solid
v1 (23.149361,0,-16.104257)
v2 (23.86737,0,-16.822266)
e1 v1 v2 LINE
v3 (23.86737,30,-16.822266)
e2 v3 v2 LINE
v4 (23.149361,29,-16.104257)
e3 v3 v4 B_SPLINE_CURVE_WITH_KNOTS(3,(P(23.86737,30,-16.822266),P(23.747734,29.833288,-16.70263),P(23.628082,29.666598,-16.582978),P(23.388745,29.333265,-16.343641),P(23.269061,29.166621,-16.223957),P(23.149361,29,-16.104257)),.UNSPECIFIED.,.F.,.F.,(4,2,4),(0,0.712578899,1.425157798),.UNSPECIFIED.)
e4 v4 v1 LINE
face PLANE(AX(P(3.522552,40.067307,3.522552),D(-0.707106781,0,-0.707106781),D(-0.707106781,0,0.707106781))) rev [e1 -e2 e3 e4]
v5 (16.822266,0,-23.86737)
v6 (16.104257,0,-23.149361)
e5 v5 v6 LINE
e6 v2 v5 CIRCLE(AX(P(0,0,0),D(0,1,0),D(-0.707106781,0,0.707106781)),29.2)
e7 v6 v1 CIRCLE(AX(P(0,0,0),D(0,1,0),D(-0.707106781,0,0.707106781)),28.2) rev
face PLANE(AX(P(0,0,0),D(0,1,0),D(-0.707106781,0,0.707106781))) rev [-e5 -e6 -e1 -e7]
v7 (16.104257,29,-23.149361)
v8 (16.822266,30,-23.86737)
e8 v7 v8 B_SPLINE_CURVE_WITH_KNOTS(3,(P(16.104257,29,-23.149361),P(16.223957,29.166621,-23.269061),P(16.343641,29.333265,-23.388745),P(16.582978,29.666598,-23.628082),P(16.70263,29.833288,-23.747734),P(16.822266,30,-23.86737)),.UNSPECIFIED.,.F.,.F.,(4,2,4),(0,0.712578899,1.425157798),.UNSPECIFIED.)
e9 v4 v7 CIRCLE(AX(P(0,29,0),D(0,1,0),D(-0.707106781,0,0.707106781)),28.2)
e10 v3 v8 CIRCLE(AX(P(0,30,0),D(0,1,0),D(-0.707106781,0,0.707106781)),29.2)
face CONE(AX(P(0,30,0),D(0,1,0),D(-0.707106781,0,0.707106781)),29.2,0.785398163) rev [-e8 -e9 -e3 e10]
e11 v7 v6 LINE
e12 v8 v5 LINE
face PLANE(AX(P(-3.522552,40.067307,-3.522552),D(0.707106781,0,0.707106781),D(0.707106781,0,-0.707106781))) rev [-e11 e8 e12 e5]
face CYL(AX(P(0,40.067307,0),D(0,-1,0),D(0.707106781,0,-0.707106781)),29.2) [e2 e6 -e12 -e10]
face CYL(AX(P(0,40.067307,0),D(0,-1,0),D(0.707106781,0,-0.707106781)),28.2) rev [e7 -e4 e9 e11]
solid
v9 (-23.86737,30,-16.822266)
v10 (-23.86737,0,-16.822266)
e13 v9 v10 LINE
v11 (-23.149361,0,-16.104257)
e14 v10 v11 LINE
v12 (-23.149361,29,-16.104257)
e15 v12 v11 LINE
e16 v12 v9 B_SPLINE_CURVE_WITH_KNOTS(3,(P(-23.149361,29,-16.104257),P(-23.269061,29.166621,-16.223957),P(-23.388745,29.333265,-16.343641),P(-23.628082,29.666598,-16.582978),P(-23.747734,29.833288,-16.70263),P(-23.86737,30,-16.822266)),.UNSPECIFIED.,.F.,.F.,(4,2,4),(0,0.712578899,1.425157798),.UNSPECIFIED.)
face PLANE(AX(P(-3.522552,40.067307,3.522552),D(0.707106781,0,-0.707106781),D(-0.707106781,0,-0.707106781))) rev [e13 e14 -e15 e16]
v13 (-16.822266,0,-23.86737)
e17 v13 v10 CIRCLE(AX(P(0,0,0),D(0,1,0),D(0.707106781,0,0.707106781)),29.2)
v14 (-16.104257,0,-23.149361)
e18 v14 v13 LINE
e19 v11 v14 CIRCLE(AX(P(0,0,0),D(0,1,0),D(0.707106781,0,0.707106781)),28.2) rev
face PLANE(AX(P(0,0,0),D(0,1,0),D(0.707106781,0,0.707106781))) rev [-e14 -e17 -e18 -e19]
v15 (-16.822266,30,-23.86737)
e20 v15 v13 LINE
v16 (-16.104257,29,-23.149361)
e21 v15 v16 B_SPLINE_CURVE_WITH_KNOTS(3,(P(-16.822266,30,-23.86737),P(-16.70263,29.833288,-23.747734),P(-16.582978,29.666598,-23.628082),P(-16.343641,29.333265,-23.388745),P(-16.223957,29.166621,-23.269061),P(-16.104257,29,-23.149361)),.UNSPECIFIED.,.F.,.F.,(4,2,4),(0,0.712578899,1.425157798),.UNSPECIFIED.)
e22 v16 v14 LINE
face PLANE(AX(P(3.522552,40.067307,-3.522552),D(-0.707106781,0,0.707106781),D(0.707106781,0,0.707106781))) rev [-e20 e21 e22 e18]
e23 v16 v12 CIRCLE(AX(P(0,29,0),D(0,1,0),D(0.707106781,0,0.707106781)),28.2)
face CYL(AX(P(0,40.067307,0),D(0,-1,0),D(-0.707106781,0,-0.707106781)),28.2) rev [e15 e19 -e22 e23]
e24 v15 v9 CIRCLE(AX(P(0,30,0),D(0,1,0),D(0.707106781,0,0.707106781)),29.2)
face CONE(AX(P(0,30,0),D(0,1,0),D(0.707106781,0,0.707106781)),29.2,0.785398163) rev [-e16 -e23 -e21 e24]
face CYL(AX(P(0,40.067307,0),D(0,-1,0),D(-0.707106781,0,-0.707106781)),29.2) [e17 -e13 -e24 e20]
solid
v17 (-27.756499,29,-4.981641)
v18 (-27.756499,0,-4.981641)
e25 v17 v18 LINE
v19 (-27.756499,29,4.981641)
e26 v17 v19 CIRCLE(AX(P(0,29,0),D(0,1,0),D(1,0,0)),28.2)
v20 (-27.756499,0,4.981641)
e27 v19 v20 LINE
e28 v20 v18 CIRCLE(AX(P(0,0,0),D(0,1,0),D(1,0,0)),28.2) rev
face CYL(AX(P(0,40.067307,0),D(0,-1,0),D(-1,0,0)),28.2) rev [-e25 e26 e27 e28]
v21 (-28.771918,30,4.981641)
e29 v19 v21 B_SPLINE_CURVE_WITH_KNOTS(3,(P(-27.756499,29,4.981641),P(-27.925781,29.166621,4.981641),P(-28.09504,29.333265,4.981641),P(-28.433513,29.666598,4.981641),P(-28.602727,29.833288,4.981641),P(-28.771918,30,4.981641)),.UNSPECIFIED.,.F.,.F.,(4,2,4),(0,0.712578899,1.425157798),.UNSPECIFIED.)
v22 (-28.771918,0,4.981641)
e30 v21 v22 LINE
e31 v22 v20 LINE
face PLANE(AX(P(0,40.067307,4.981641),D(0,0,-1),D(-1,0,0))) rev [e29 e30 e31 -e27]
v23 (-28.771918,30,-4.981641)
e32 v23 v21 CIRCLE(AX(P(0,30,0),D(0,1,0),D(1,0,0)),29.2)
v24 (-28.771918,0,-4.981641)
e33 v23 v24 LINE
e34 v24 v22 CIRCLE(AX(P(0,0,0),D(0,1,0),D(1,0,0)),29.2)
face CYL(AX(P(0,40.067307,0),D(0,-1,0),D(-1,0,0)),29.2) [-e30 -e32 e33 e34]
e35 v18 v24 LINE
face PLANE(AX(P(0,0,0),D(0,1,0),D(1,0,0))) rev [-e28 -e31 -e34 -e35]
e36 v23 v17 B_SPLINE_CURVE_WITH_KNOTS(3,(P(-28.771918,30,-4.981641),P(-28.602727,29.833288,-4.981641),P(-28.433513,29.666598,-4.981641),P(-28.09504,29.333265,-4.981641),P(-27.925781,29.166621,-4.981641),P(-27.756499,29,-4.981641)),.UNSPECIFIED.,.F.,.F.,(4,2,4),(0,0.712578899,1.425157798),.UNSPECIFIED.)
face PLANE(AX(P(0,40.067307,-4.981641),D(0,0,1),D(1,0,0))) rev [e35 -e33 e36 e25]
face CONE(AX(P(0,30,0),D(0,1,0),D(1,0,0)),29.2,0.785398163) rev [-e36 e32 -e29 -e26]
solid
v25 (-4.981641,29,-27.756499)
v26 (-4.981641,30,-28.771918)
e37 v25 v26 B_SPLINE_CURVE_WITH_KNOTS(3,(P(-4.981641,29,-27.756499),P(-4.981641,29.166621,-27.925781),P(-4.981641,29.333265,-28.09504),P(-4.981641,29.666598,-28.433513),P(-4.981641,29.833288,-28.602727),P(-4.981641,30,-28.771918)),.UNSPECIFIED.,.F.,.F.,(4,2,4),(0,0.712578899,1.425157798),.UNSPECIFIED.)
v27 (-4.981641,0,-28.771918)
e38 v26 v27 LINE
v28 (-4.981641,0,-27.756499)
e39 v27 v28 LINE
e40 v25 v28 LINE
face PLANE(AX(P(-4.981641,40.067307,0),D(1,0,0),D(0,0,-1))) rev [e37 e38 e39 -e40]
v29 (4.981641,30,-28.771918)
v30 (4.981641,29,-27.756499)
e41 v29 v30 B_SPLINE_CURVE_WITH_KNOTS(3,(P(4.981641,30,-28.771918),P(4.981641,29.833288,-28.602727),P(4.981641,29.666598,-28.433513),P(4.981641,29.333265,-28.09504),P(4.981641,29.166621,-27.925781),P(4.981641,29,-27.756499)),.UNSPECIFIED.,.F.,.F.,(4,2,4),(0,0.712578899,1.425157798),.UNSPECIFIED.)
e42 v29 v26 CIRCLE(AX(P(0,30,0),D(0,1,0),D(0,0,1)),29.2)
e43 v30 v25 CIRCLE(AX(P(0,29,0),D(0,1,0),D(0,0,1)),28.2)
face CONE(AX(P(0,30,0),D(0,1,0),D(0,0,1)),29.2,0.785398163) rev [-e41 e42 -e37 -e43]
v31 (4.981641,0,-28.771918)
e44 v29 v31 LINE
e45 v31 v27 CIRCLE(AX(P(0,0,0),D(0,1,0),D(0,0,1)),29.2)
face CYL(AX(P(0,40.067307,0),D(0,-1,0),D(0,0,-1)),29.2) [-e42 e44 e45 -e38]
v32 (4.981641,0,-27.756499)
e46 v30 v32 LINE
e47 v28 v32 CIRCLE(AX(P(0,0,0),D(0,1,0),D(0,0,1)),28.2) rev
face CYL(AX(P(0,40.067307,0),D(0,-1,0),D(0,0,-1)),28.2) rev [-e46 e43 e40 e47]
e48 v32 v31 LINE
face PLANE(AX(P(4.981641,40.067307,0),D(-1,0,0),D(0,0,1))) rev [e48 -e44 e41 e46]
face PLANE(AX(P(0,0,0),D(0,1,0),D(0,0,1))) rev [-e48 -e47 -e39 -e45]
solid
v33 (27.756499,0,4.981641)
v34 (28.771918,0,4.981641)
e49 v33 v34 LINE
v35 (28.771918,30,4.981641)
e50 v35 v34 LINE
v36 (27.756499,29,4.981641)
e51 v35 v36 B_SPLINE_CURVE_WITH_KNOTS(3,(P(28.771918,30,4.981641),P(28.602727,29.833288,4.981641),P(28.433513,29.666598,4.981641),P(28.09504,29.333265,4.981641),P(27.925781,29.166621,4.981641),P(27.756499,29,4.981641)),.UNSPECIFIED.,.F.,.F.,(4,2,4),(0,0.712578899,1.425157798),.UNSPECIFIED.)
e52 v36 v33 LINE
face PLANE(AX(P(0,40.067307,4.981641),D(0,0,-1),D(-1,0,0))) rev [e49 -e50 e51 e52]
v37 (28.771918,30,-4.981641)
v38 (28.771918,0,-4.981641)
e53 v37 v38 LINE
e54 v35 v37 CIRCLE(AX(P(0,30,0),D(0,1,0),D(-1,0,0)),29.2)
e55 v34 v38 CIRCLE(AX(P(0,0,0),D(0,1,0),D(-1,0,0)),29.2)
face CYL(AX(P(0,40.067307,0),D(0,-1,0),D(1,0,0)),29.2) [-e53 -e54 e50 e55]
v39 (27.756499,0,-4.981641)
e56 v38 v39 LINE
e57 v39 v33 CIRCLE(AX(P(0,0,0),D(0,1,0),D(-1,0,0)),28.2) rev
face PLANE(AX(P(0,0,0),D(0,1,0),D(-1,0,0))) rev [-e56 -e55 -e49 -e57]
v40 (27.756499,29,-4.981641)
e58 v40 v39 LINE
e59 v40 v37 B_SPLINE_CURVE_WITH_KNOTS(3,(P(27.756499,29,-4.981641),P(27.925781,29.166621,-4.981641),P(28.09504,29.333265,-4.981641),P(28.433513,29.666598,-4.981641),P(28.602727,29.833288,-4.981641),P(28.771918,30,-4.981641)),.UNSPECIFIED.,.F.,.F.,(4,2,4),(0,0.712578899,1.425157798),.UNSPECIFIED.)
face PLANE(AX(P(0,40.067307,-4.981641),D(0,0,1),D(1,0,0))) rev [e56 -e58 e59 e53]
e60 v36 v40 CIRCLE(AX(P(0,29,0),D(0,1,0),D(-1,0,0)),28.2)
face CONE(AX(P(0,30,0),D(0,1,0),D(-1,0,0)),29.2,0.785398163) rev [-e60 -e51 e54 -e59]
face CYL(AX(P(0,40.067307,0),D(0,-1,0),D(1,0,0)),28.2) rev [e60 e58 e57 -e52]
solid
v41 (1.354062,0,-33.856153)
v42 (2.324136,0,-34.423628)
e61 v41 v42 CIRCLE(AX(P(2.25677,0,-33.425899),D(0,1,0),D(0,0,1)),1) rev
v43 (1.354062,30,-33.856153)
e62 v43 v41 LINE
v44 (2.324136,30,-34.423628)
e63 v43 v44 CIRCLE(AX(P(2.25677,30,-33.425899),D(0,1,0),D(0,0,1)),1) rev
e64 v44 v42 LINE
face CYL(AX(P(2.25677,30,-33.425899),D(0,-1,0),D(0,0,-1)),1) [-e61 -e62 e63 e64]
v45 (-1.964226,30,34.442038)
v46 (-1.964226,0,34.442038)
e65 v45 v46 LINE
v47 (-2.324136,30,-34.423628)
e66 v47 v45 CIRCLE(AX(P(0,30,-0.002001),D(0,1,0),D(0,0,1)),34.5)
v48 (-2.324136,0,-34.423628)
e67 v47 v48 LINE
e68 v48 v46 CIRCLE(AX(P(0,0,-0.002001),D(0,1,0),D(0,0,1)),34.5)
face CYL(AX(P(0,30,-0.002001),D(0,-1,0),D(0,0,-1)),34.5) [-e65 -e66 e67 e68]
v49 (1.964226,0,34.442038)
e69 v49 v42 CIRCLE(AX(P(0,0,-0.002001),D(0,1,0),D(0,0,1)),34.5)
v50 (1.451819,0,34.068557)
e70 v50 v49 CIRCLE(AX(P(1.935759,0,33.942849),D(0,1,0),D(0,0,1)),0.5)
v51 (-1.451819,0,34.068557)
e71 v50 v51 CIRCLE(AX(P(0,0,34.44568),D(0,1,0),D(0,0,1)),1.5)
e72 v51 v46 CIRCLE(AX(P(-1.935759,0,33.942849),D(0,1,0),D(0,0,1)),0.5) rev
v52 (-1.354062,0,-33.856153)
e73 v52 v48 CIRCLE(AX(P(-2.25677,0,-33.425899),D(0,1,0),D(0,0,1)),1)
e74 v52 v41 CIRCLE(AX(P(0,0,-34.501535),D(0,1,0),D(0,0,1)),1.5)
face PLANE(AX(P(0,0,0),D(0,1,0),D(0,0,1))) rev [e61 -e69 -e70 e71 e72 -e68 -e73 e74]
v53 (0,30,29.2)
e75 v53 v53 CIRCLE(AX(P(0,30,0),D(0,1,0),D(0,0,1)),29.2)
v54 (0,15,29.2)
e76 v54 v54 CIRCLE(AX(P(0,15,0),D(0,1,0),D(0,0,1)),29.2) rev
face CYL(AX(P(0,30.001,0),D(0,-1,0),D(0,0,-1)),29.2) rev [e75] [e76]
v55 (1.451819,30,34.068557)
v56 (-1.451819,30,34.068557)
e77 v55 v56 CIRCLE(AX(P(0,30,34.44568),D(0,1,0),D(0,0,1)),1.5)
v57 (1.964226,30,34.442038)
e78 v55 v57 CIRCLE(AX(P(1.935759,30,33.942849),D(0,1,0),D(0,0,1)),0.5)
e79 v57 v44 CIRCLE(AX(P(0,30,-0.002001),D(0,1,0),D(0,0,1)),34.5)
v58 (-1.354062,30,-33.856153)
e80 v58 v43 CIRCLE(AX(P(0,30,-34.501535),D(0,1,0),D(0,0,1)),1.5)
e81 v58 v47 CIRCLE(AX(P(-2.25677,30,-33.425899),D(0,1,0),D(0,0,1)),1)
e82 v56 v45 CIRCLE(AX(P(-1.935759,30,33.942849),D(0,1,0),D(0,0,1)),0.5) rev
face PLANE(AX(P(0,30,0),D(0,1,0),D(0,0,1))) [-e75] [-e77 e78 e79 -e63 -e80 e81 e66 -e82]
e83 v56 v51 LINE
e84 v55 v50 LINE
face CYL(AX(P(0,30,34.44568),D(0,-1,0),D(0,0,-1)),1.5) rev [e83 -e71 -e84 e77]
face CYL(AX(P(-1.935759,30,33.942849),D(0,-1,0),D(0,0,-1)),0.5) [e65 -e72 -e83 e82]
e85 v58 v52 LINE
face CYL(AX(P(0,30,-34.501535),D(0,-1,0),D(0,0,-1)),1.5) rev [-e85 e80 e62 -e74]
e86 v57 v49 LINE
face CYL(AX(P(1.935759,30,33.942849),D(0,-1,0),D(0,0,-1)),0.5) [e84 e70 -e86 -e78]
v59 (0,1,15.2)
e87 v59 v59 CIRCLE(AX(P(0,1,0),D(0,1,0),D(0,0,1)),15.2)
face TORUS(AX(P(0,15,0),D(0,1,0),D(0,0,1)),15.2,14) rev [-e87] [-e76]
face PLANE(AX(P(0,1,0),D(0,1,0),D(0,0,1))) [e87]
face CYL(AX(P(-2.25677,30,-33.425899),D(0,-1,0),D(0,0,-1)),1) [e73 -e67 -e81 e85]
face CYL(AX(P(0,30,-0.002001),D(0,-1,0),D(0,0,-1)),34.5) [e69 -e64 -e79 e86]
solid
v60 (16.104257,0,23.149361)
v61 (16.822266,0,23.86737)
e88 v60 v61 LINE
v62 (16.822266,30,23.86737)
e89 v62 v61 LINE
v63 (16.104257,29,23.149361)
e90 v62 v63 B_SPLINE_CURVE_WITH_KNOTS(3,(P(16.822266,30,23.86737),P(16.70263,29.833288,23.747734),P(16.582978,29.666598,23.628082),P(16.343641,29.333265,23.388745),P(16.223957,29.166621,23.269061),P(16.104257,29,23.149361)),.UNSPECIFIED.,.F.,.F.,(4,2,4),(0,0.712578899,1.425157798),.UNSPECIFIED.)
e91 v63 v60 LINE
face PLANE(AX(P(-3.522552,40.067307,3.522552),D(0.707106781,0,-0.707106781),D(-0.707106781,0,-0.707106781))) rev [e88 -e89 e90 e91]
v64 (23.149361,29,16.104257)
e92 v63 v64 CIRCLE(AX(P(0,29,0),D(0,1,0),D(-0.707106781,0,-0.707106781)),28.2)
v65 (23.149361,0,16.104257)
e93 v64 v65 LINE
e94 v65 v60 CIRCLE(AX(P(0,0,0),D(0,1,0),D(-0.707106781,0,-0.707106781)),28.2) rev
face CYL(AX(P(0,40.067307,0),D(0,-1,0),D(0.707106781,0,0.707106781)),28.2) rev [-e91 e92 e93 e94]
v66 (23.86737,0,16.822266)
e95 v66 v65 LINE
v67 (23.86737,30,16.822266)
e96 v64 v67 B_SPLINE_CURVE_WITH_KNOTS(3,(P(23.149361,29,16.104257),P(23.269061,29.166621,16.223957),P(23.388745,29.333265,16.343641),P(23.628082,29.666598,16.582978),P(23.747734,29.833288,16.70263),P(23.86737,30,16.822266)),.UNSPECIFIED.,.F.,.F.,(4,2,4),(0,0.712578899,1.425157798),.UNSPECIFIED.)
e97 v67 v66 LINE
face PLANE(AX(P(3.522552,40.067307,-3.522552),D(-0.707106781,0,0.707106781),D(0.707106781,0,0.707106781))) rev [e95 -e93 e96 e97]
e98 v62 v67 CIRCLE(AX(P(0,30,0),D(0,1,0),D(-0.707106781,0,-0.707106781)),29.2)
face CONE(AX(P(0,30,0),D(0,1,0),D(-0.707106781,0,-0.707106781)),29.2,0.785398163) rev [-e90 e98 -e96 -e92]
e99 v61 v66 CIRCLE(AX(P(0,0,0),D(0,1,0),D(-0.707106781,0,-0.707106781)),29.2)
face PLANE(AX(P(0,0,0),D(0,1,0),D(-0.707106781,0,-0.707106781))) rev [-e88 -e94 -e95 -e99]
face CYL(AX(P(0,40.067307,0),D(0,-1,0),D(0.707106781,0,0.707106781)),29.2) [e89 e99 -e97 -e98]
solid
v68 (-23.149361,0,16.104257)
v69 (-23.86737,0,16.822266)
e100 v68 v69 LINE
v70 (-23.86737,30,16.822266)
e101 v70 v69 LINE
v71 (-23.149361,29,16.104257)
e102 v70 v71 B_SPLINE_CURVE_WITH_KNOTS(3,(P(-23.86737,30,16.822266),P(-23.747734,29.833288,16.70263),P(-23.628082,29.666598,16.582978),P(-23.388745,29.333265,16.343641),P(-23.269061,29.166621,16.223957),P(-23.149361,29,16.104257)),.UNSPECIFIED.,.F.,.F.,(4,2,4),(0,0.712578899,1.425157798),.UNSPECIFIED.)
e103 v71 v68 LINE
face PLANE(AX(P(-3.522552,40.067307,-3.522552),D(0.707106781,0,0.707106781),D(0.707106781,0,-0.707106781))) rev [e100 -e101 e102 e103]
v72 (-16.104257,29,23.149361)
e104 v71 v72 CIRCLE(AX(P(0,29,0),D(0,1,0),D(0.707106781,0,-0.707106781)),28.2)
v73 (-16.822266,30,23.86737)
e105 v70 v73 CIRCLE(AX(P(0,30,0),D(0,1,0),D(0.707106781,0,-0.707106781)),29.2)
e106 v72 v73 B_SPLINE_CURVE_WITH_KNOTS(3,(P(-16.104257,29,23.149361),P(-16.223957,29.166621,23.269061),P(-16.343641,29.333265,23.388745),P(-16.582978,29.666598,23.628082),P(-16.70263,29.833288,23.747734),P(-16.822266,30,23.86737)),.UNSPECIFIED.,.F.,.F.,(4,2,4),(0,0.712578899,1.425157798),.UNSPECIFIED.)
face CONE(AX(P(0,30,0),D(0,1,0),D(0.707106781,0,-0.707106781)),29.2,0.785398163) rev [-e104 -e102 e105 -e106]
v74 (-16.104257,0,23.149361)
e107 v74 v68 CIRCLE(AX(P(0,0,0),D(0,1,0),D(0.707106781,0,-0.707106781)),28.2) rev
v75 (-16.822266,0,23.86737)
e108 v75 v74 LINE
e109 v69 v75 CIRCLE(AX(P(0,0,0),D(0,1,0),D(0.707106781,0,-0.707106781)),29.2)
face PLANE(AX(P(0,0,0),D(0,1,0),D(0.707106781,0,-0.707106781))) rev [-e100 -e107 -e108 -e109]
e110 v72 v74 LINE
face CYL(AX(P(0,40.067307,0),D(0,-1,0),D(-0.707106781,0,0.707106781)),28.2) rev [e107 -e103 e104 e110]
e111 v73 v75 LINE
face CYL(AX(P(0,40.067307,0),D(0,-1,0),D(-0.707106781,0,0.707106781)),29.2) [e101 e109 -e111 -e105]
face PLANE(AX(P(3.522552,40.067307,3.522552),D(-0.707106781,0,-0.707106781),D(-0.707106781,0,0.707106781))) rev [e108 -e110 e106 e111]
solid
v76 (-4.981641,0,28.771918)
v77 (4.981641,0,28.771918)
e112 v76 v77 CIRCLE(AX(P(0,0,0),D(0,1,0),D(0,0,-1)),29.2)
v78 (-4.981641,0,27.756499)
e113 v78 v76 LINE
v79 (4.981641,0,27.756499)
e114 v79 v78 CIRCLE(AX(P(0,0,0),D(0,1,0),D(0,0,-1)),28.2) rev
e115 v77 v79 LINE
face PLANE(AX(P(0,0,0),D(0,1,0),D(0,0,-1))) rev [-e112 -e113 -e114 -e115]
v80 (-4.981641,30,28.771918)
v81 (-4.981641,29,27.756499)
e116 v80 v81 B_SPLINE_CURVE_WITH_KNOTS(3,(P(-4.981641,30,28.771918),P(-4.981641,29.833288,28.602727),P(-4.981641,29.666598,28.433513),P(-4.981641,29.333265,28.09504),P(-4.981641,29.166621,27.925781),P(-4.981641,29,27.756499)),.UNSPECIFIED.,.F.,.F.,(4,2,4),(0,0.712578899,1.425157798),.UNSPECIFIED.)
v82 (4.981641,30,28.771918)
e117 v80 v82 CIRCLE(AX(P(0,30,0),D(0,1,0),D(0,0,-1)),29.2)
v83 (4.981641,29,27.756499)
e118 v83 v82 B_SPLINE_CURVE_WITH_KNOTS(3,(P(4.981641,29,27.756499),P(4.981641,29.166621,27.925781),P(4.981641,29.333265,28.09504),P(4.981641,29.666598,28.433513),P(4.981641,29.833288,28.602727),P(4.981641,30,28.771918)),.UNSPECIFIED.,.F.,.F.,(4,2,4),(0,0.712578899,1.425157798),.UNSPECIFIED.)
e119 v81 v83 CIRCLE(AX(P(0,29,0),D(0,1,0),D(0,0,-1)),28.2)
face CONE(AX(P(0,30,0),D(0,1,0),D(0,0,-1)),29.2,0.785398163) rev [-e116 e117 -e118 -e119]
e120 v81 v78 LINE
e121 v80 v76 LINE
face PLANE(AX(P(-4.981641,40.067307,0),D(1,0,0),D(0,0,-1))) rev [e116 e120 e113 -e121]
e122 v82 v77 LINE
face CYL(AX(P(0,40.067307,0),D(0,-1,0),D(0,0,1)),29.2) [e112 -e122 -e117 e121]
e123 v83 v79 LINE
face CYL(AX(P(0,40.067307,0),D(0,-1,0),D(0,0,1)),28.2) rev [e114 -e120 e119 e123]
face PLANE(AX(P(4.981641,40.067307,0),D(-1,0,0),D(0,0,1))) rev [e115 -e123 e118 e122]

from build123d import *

# Parameters (mm, degrees)
BOSS_EXTRUDE1_DEPTH = 30
CUT_EXTRUDE2_REACH  = 60.241
CUT_EXTRUDE2_START  = 1
SKETCH2_R           = 29.2
BOSS_EXTRUDE2_DEPTH = 30
CHAMFER2_SIZE       = 1
CIRPATTERN2_COUNT   = 8
FILLET2_R           = 14


with BuildPart() as part:
    # Sketch1 → Boss-Extrude1 (new body)
    with BuildSketch(Plane(origin=(0, 0, 0), x_dir=(1, 0, 0), z_dir=(0, 1, 0))):
        with BuildLine():
            ThreePointArc((1.451818925, -34.068556857), (1.641248992, -34.346908706), (1.964225605, -34.442038138))
            ThreePointArc((1.964225605, -34.442038138), (34.499528846, -0.178302888), (2.324135821, 34.423627607))
            ThreePointArc((2.324135821, 34.423627607), (1.751838249, 34.289058819), (1.354061739, 33.856153382))
            ThreePointArc((1.354061739, 33.856153382), (0, 33.001534515), (-1.354061739, 33.856153382))
            ThreePointArc((-1.354061739, 33.856153382), (-1.751838249, 34.289058819), (-2.324135821, 34.423627607))
            ThreePointArc((-2.324135821, 34.423627607), (-34.499528846, -0.178302888), (-1.964225605, -34.442038138))
            ThreePointArc((-1.964225605, -34.442038138), (-1.641248992, -34.346908706), (-1.451818925, -34.068556857))
            ThreePointArc((-1.451818925, -34.068556857), (0, -32.945679925), (1.451818925, -34.068556857))
        make_face()
    extrude(amount=BOSS_EXTRUDE1_DEPTH)

    # Sketch2 → Cut-Extrude2 (cut, up to next)
    with BuildSketch(Plane(origin=(0, 0, 0), x_dir=(1, 0, 0), z_dir=(0, 1, 0)).offset(CUT_EXTRUDE2_START), mode=Mode.PRIVATE) as cut_extrude2_sk1:
        with Locations(Location((0, 0, 0), (0, 0, 270))):
            Circle(SKETCH2_R)
    cut_extrude2_tool1 = extrude(cut_extrude2_sk1.sketch, amount=CUT_EXTRUDE2_REACH, mode=Mode.PRIVATE) & part.part
    add(cut_extrude2_tool1.solids().sort_by_distance((0, 1, 0))[0], mode=Mode.SUBTRACT)

    # Fillet2
    fillet2_edges = [part.edges().sort_by_distance(p)[0] for p in [
        (0, 1, -29.2),
    ]]
    fillet(fillet2_edges, radius=FILLET2_R)


with BuildPart() as body_2:
    # Sketch2<2> → Boss-Extrude2 (new body)
    with BuildSketch(Plane(origin=(0, 0, 0), x_dir=(1, 0, 0), z_dir=(0, 1, 0))):
        with BuildLine():
            ThreePointArc((4.981640858, 28.771917808), (0, 29.2), (-4.981640858, 28.771917808))
            Line((-4.981640858, 28.771917808), (-4.981640858, 27.756499318))
            ThreePointArc((-4.981640858, 27.756499318), (0, 28.2), (4.981640858, 27.756499318))
            Line((4.981640858, 27.756499318), (4.981640858, 28.771917808))
        make_face()
    extrude(amount=BOSS_EXTRUDE2_DEPTH)

    # Chamfer2
    chamfer2_edges = [body_2.edges().sort_by_distance(p)[0] for p in [
        (0, 30, -28.2),
    ]]
    chamfer(chamfer2_edges, length=CHAMFER2_SIZE - 0.0001)  # a hair under: the kernel refuses the full size


with BuildPart() as cirpattern2_1:
    # CirPattern2: pattern copy
    add(body_2.part.rotate(Axis((0, 0, 0), (0, 1, 0)), 1 * 360 / CIRPATTERN2_COUNT))


with BuildPart() as cirpattern2_2:
    # CirPattern2: pattern copy
    add(body_2.part.rotate(Axis((0, 0, 0), (0, 1, 0)), 2 * 360 / CIRPATTERN2_COUNT))


with BuildPart() as cirpattern2_3:
    # CirPattern2: pattern copy
    add(body_2.part.rotate(Axis((0, 0, 0), (0, 1, 0)), 3 * 360 / CIRPATTERN2_COUNT))


with BuildPart() as cirpattern2_4:
    # CirPattern2: pattern copy
    add(body_2.part.rotate(Axis((0, 0, 0), (0, 1, 0)), 4 * 360 / CIRPATTERN2_COUNT))


with BuildPart() as cirpattern2_5:
    # CirPattern2: pattern copy
    add(body_2.part.rotate(Axis((0, 0, 0), (0, 1, 0)), 5 * 360 / CIRPATTERN2_COUNT))


with BuildPart() as cirpattern2_6:
    # CirPattern2: pattern copy
    add(body_2.part.rotate(Axis((0, 0, 0), (0, 1, 0)), 6 * 360 / CIRPATTERN2_COUNT))


with BuildPart() as cirpattern2_7:
    # CirPattern2: pattern copy
    add(body_2.part.rotate(Axis((0, 0, 0), (0, 1, 0)), 7 * 360 / CIRPATTERN2_COUNT))


solid = Compound([part.part, body_2.part, cirpattern2_1.part, cirpattern2_2.part, cirpattern2_3.part, cirpattern2_4.part, cirpattern2_5.part, cirpattern2_6.part, cirpattern2_7.part])
